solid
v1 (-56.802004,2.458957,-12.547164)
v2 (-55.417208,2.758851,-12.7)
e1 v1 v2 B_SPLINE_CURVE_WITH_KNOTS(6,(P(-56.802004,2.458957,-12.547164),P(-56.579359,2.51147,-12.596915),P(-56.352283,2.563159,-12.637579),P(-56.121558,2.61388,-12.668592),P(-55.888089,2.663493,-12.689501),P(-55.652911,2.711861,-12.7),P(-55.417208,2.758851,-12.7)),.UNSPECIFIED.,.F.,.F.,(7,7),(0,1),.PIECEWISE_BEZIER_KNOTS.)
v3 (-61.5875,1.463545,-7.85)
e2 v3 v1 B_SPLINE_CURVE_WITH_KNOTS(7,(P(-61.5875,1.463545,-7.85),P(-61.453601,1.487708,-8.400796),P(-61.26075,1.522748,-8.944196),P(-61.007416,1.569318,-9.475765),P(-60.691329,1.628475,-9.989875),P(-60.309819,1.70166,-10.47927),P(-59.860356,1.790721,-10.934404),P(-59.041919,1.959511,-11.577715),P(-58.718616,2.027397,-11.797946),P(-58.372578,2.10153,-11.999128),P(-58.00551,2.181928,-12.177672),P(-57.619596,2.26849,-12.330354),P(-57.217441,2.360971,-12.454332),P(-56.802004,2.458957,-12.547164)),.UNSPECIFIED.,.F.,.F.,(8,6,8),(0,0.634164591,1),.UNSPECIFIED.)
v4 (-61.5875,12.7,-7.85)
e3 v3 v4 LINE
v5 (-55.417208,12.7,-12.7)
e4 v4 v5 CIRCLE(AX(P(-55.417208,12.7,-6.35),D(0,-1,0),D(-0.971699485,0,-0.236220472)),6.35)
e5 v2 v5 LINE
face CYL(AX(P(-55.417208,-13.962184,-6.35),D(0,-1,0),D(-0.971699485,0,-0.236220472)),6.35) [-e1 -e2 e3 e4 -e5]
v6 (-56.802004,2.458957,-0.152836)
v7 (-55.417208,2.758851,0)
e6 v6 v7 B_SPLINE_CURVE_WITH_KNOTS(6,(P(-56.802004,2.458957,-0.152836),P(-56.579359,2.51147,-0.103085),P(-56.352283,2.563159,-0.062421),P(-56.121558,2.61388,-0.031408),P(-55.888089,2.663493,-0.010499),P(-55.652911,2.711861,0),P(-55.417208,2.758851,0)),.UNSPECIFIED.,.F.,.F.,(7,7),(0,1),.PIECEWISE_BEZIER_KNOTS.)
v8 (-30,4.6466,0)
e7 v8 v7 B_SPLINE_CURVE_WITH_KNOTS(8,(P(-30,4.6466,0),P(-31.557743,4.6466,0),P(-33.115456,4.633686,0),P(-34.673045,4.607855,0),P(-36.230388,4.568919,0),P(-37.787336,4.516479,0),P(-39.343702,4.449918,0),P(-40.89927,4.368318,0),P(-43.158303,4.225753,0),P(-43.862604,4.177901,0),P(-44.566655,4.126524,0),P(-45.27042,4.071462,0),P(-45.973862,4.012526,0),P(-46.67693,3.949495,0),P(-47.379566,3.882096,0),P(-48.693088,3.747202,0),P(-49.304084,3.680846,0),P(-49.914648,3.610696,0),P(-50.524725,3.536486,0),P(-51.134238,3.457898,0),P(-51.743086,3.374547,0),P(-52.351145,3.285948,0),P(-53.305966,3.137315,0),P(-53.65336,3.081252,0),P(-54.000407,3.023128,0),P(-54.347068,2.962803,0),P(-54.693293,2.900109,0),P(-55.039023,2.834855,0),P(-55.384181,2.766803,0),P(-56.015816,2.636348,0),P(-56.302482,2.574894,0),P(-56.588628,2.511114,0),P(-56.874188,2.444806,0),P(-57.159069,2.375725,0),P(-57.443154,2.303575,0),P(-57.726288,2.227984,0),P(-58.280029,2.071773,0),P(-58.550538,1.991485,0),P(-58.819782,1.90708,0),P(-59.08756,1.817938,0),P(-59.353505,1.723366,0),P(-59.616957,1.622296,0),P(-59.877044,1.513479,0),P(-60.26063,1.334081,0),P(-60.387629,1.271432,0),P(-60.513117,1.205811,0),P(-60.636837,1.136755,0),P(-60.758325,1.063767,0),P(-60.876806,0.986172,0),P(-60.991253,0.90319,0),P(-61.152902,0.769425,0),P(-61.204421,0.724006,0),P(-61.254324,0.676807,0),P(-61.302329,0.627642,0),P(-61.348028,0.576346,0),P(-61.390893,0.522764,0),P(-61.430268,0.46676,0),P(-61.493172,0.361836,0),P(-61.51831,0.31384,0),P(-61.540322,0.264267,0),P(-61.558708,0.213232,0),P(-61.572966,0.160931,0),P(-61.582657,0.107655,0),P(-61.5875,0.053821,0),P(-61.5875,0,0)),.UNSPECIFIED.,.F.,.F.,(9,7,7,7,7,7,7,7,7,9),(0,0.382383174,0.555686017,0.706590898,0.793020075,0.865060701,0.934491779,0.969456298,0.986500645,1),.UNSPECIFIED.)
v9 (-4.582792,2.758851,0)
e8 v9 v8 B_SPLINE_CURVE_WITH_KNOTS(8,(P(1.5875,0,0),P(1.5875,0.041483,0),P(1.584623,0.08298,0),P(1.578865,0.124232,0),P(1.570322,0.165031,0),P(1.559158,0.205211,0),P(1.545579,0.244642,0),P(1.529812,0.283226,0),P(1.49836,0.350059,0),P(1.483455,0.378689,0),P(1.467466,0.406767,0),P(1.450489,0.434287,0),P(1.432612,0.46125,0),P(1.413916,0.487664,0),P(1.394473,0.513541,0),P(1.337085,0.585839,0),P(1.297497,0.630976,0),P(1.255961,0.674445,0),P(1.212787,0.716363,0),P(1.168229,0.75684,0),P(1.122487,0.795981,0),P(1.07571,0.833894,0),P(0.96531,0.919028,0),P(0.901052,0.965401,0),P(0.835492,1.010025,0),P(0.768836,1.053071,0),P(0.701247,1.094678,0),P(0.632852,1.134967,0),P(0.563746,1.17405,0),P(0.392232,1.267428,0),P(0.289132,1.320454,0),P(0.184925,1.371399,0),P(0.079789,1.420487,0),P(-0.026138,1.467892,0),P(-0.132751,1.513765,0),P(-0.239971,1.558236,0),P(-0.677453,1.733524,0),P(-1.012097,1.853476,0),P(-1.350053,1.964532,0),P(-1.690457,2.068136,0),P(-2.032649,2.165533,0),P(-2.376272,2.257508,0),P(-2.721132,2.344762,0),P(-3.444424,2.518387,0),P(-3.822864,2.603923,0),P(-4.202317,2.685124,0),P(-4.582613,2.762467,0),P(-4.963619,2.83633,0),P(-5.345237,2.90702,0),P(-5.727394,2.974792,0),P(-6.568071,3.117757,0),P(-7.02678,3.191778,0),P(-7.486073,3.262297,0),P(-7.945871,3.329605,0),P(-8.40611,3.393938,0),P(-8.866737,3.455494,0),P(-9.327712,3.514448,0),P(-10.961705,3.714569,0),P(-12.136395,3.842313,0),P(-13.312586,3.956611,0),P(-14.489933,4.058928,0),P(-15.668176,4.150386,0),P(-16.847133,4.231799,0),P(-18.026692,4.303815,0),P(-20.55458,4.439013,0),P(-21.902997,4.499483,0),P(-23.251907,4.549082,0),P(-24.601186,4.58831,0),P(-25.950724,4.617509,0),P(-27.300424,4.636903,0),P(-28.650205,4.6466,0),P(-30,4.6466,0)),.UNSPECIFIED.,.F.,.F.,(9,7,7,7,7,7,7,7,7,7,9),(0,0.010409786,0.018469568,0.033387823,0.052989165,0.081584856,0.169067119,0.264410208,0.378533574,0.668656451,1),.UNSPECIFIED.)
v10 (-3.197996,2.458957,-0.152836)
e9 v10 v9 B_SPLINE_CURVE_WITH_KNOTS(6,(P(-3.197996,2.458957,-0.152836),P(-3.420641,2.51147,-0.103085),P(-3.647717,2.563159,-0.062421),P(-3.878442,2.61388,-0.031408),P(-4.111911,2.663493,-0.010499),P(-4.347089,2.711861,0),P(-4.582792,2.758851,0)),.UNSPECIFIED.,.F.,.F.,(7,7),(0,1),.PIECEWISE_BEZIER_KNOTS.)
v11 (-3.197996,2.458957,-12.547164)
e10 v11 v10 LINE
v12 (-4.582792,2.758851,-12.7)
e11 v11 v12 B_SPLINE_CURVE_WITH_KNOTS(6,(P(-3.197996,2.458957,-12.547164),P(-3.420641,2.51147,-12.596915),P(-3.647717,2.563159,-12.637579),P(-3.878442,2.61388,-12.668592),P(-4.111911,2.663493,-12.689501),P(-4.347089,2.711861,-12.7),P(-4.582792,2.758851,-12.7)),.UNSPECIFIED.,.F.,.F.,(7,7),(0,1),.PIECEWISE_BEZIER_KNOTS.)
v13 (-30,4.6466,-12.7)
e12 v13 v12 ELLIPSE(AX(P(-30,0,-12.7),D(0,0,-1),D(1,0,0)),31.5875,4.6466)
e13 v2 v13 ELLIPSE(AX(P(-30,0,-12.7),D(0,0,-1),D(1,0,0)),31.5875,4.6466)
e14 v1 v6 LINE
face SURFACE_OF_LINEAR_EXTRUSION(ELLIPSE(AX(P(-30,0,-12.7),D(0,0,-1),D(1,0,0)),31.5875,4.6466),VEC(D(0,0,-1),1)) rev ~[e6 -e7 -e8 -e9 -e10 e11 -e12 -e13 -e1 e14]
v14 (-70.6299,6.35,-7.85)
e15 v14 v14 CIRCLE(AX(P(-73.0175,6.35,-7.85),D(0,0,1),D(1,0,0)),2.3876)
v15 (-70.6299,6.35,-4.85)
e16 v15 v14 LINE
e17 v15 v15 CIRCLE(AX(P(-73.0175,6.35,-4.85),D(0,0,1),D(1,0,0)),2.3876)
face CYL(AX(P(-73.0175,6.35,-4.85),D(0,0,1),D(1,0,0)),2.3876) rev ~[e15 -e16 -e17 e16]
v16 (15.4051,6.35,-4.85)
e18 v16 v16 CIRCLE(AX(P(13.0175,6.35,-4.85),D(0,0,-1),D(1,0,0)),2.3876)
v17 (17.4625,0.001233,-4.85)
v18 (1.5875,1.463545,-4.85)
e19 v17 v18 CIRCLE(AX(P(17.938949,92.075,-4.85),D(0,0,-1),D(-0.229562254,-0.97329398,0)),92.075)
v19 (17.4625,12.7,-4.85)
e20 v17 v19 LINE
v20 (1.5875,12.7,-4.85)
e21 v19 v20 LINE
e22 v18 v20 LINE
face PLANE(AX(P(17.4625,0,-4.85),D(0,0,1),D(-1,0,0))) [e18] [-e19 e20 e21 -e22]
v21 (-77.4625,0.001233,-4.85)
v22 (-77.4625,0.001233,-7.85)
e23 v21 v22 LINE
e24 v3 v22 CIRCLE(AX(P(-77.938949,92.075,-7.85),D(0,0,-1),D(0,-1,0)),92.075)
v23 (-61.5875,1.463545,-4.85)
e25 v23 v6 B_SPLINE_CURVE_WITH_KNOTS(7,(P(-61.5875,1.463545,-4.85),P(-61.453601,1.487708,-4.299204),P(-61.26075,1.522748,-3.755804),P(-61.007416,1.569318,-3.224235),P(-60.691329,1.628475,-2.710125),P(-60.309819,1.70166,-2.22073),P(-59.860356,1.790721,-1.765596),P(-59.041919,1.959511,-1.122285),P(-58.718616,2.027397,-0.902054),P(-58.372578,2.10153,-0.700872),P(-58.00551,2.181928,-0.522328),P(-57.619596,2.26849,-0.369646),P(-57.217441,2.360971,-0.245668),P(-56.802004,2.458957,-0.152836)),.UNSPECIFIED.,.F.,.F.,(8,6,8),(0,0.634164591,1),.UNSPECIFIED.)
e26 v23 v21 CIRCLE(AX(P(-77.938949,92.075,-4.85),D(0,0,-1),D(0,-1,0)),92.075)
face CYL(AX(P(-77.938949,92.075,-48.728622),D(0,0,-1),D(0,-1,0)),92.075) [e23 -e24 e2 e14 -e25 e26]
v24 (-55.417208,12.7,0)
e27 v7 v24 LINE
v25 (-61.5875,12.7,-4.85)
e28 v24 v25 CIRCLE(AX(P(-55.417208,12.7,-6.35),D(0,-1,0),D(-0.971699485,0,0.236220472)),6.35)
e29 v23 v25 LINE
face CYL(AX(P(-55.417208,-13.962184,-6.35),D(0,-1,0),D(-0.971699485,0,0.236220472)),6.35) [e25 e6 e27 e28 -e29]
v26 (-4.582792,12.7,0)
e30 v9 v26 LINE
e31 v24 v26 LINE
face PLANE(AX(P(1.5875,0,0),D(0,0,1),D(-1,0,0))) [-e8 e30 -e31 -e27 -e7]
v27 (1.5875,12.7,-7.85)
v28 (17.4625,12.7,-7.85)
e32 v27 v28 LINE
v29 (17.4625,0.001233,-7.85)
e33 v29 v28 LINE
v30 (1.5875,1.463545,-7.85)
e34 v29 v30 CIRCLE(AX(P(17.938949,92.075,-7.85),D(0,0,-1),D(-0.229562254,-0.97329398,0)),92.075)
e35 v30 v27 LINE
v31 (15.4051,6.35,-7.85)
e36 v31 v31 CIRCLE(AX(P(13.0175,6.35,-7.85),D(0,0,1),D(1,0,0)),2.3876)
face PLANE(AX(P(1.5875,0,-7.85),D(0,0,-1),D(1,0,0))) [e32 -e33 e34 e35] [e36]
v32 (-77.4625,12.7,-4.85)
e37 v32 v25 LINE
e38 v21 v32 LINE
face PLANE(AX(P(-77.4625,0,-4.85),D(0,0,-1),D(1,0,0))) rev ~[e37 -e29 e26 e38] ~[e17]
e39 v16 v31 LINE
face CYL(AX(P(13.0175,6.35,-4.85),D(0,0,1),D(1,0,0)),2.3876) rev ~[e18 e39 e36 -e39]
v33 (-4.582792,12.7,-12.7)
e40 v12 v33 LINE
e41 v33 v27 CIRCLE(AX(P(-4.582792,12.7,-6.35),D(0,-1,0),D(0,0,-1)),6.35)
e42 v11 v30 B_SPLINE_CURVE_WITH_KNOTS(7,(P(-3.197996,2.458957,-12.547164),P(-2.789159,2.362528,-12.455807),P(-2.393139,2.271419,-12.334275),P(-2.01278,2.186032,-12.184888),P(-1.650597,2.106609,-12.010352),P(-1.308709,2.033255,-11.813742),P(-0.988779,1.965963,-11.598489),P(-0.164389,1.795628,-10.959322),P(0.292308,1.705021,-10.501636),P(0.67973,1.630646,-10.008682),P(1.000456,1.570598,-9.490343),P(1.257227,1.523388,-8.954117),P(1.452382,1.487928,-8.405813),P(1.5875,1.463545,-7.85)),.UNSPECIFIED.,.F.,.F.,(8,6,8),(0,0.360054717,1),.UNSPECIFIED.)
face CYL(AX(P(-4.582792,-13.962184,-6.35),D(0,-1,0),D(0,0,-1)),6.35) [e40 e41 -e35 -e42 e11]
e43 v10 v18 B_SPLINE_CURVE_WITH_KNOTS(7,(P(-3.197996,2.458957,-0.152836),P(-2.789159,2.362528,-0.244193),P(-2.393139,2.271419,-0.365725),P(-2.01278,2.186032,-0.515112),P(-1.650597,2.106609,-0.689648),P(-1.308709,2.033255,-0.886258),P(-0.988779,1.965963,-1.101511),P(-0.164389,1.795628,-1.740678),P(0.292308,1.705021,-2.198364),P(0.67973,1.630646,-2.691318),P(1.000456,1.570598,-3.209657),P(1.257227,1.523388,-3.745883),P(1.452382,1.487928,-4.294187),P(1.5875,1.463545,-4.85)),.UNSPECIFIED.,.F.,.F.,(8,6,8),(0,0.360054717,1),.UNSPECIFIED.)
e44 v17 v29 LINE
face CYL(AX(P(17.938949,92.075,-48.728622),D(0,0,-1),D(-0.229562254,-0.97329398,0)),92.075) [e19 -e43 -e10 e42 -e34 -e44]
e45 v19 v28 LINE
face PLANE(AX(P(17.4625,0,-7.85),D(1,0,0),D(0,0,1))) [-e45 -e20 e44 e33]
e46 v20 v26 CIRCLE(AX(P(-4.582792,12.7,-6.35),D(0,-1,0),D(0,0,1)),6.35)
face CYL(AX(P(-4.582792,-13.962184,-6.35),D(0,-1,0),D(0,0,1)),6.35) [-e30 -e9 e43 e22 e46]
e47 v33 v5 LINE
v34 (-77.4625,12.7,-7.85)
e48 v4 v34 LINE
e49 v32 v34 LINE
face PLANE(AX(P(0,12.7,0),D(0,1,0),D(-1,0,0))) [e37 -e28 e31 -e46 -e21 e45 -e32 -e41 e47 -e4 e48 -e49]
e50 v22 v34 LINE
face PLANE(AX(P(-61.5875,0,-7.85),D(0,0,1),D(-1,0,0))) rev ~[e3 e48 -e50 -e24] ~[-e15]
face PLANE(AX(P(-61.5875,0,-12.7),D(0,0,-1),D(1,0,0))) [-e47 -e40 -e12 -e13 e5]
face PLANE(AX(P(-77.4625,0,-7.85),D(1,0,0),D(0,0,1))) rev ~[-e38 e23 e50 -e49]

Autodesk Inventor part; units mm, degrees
ref_plane "YZ Plane" through (0, 0, 0) normal (1, 0, 0) x (0, 1, 0)
ref_plane "XZ Plane" through (0, 0, 0) normal (0, 1, 0) x (-1, 0, 0)
ref_plane "XY Plane" through (0, 0, 0) normal (0, 0, 1) x (1, 0, 0)
sketch "Sketch1" plane through (0, 0, 0) normal (0, 1, 0) x (-1, 0, 0)
  line L0 (77.4625, -7.85) -> (77.4625, -4.85)
  line L1 (0, 0) -> (17.4625, 0) construction
  line L2 (77.4625, -6.35) -> (77.4625, -4.85)
  line L3 (77.4625, -4.85) -> (61.5875, -4.85)
  line L4 (61.5875, -7.85) -> (77.4625, -7.85)
  line L5 (61.5875, -4.85) -> (61.5875, 0)
  line L6 (61.5875, -7.85) -> (61.5875, -12.7)
  line L7 (61.5875, 0) -> (30, 0)
  line L8 (61.5875, -12.7) -> (30, -12.7)
  line L9 (-17.4625, -7.85) -> (-17.4625, -4.85)
  line L10 (-17.4625, -6.35) -> (-17.4625, -4.85)
  line L11 (-17.4625, -4.85) -> (-1.5875, -4.85)
  line L12 (-1.5875, -7.85) -> (-17.4625, -7.85)
  line L13 (-1.5875, -4.85) -> (-1.5875, 0)
  line L14 (-1.5875, -7.85) -> (-1.5875, -12.7)
  line L15 (-1.5875, 0) -> (30, 0)
  line L16 (-1.5875, -12.7) -> (30, -12.7)
  dimension "d23" = 1.5
  dimension "d24" = 15.875
  dimension "d25" = 3
  dimension "d27" = 63.175
  dimension "d117" = 12.7
extrude "Extrusion1" add sketch "Sketch1" along normal blind 12.7
sketch "Sketch3" plane through (1.5875, 0, -12.7) normal (0, 0, -1) x (-1, 0, 0)
  line L0 (0, 0) -> (63.175, 0) projected
  ellipse E0 centre (31.5875, 0) end of major axis (31.5875, 4.6466) minor radius 31.5875
  point P0 (1.5875, 0)
extrude "Extrusion15" cut sketch "Sketch3" against normal blind 20.6375
sketch "Sketch4" plane through (-77.4625, 12.7, -4.85) normal (0, 0, 1) x (1, 0, 0)
  line L0 (15.875, -12.7) -> (15.875, 0) projected
  line L1 (15.875, -6.35) -> (4.445, -6.35)
  circle A0 centre (4.445, -6.35) radius 2.3876
  line L2 (79.05, -12.7) -> (79.05, 0) projected
  line L3 (79.05, -6.35) -> (90.48, -6.35)
  circle A1 centre (90.48, -6.35) radius 2.3876
  point P0 (77.4625, -12.7)
  dimension "d111" = 11.43
  dimension "d112" = 4.7752
  dimension "d113" = 11.43
  dimension "d114" = 4.7752
extrude "Extrusion16" cut sketch "Sketch4" against normal blind 58.7375
fillet "Fillet1" radius 92.075 2 edges at (1.5875, 0, -6.35) (-61.5875, 0, -6.35)
fillet "Fillet2" radius 6.35 4 edges at (1.5875, 7.0818, -12.7) (-61.5875, 7.0818, -12.7) (-61.5875, 7.0818, 0) (1.5875, 7.0818, 0)
properties part number "AllFretBars"
